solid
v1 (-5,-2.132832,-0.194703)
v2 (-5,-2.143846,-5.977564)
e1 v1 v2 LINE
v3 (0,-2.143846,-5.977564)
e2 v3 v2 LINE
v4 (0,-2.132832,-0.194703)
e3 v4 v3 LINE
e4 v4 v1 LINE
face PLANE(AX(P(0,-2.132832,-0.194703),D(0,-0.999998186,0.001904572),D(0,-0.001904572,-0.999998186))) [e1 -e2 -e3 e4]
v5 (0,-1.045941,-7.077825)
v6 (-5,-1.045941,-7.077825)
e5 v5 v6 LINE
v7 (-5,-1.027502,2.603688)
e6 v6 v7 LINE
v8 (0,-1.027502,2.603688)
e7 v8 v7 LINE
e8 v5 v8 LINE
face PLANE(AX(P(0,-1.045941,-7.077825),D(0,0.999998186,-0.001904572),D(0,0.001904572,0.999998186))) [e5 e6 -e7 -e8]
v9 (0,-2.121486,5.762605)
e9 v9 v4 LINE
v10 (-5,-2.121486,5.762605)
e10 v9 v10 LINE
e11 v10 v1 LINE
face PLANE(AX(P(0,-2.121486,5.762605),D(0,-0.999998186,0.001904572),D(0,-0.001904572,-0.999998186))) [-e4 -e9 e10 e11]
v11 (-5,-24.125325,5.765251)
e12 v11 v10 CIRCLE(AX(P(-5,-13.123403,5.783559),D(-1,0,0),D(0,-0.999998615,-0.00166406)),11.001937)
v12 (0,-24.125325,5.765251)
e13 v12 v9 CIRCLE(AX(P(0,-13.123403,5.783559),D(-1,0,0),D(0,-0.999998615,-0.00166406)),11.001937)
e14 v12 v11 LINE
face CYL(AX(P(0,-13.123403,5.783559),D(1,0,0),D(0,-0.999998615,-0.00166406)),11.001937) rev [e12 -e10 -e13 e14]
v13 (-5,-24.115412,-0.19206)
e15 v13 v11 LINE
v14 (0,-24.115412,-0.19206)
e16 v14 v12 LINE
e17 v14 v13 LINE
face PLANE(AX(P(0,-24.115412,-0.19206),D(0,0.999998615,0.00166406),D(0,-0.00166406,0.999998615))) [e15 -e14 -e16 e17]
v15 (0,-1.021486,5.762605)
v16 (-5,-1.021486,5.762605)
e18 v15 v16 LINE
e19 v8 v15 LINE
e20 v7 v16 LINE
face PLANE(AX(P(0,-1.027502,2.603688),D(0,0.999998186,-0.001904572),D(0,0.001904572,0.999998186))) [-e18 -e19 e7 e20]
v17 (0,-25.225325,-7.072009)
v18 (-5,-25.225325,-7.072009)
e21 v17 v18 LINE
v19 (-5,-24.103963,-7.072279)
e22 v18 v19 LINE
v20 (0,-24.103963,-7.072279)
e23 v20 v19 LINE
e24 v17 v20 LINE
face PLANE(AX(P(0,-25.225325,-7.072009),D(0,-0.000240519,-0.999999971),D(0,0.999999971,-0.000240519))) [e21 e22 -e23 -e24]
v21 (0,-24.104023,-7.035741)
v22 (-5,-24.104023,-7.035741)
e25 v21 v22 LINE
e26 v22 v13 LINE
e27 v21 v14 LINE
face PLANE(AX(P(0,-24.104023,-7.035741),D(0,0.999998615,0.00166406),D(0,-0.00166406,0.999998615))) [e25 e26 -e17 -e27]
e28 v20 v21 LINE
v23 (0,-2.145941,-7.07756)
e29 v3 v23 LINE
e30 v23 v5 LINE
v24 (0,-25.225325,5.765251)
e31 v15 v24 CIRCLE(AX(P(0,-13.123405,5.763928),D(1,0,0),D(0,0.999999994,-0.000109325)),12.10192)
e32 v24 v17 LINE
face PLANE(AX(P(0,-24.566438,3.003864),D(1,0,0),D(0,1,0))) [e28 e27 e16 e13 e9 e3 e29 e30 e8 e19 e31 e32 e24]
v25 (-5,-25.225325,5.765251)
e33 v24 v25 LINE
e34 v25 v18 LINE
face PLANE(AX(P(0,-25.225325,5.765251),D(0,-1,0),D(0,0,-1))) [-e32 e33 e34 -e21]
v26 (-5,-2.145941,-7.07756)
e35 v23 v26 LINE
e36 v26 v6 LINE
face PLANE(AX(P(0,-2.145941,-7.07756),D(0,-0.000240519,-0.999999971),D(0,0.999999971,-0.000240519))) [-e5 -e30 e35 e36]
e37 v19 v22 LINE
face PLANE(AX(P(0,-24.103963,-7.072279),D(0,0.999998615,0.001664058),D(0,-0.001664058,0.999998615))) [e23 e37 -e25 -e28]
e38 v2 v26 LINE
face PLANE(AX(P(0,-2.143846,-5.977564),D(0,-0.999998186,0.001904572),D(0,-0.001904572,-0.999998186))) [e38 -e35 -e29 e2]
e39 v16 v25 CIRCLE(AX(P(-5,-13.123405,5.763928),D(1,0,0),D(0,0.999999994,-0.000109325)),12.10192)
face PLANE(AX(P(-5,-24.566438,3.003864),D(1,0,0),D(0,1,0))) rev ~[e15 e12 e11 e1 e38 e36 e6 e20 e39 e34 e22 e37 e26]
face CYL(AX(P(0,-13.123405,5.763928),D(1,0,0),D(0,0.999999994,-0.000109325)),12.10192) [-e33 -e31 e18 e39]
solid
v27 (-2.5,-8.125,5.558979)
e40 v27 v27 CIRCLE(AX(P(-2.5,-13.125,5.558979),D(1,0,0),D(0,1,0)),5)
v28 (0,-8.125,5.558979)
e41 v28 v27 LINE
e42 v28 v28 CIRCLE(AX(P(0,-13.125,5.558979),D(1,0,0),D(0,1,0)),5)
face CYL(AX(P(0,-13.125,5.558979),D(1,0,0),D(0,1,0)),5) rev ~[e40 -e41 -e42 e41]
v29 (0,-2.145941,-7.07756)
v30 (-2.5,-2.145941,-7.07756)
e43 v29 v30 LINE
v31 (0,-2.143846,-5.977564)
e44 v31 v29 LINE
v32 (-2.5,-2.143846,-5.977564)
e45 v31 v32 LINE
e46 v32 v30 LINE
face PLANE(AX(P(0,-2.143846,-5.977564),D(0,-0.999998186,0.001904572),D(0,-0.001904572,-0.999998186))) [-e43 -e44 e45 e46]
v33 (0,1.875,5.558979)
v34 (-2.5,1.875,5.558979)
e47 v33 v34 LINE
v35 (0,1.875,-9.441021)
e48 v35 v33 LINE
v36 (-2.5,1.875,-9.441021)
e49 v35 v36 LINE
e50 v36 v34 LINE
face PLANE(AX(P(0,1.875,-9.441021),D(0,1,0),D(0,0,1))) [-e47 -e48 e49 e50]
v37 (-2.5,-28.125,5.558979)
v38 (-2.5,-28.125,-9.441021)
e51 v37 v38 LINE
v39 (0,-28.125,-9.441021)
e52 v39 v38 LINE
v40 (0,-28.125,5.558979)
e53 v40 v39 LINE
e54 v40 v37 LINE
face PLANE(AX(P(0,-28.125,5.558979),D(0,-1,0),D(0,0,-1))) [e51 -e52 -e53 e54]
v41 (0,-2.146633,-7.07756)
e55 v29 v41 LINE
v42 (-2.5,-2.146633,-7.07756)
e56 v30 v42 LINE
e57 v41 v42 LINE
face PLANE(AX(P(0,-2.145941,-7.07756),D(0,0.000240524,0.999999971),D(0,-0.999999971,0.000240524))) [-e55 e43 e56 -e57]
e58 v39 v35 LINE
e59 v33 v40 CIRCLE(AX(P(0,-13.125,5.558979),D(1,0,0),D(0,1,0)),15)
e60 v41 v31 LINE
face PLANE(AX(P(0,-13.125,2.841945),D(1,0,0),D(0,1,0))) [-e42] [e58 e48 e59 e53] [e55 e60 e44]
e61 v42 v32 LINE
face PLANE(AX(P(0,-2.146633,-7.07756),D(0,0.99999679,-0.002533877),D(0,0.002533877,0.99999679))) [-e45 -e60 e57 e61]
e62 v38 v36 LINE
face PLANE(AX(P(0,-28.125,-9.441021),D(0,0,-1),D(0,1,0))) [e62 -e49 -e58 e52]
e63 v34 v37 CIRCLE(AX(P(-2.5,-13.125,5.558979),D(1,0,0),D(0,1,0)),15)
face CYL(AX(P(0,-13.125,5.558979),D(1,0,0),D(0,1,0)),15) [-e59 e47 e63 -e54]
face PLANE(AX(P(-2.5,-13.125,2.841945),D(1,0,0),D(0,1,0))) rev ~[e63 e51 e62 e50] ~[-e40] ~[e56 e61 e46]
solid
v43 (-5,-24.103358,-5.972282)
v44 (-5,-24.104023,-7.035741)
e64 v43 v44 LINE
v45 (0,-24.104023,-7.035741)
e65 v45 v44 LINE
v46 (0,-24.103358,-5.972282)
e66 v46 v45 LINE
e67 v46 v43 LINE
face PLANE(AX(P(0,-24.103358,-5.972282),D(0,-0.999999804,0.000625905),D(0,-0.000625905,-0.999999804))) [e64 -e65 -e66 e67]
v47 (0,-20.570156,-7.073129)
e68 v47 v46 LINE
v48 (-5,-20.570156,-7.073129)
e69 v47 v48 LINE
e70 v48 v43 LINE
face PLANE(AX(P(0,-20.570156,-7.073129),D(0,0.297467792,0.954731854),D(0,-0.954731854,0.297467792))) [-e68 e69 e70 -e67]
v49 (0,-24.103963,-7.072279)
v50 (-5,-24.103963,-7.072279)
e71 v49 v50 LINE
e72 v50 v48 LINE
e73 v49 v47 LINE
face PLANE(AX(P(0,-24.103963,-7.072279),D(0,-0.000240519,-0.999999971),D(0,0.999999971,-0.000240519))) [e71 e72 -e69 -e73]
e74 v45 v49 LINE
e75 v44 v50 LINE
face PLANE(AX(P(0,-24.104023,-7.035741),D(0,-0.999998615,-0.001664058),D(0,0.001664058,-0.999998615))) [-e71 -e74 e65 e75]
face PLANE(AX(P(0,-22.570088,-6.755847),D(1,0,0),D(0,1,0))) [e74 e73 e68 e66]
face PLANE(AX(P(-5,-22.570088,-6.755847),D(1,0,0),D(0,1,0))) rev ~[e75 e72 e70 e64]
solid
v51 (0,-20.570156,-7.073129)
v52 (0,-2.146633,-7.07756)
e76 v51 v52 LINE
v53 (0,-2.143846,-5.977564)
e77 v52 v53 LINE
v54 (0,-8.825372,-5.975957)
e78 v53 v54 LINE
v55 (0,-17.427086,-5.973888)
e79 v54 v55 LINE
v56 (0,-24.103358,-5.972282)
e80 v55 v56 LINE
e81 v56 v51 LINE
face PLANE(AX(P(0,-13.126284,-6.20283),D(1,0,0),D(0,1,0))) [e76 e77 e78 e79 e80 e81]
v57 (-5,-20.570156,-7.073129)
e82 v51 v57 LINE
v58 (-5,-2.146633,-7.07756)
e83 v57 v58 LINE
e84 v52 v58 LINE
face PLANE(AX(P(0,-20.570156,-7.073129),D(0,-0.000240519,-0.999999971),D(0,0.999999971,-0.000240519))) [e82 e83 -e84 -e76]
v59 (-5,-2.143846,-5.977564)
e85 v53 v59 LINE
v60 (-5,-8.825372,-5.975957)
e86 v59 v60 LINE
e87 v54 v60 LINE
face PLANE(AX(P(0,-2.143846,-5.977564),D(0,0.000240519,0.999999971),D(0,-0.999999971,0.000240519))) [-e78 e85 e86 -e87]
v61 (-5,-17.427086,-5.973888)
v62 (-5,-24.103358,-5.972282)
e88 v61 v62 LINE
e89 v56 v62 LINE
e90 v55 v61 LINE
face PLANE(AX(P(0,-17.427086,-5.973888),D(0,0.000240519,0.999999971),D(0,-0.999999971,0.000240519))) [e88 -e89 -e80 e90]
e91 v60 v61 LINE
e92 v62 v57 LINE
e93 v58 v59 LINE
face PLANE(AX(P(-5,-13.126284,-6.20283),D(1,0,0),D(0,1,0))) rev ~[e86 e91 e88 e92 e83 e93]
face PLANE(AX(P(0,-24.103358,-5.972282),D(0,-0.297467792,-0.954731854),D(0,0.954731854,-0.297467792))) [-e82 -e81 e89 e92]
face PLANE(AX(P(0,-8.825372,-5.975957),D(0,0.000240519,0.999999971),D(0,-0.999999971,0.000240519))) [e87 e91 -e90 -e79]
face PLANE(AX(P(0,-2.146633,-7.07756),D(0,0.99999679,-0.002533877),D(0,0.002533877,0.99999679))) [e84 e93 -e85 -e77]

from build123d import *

# Parameters (mm, degrees)
F0_R     = 5
F1_DEPTH = 2.5
F2_DEPTH = 5
F3_DEPTH = 5


# Not quite as in the source:
# - a feature names something its author has since deleted; it is built from what else it names


with BuildPart() as f1:
    # F0 (on Right) → F1 (new body)
    with BuildSketch(Plane.YZ):
        with BuildLine():
            Line((1.875, -4.4410212704), (1.875, 5.5589787296))
            ThreePointArc((1.875, 5.5589787296), (-13.125, 20.5589787296), (-28.125, 5.5589787296))
            Line((-28.125, 5.5589787296), (-28.125, -9.4410212704))
            Line((-28.125, -9.4410212704), (1.875, -9.4410212704))
            Line((1.875, -9.4410212704), (1.875, -4.4410212704))
        make_face()
        with BuildLine():
            ThreePointArc((-0.6214854401, 5.7639283943), (-0.6214854576, 5.7632668705), (-0.6214855101, 5.7626053467))
            Line((-0.6214855101, 5.7626053467), (-0.6214855101, -7.441388098))
            Line((-0.6214855101, -7.441388098), (-1.0466333126, -7.4412858417))
            Line((-1.0466333126, -7.4412858417), (-2.1466328087, -7.4410212704))
            Line((-2.1466328087, -7.4410212704), (-24.1033577683, -7.4357402504))
            Line((-24.1033577683, -7.4357402504), (-25.2253250397, -7.4354703954))
            Line((-25.2253250397, -7.4354703954), (-25.6253250397, -7.4353741876))
            Line((-25.6253250397, -7.4353741876), (-25.6253250397, 5.7652514419))
            ThreePointArc((-25.6253250397, 5.7652514419), (-13.1227437511, 18.2658482116), (-0.6214854401, 5.7639283943))
        make_face(mode=Mode.SUBTRACT)
        with BuildLine():
            ThreePointArc((-8.825371599, -5.9759567979), (-4.9508229486, -3.6968800238), (-2.1328316515, -0.1947030957))
            Line((-2.1328316515, -0.1947030957), (-2.1214855101, 5.7626053467))
            ThreePointArc((-2.1214855101, 5.7626053467), (-13.1220798645, 16.7854966034), (-24.1253250397, 5.7652514419))
            Line((-24.1253250397, 5.7652514419), (-24.1154117036, -0.192059557))
            ThreePointArc((-24.1154117036, -0.192059557), (-21.2994002975, -3.6939309404), (-17.4270857953, -5.9738879181))
            Line((-17.4270857953, -5.9738879181), (-8.825371599, -5.9759567979))
        make_face()
        with Locations((-13.125, 5.5589787296)):
            Circle(F0_R, mode=Mode.SUBTRACT)
        with BuildLine():
            ThreePointArc((-25.2253250397, 2.6268061761), (-25.5250055228, 4.1833243656), (-25.6253249696, 5.7652514419))
            Line((-25.6253250397, 5.7652514419), (-25.6253250397, -7.4353741876))
            Line((-25.6253250397, -7.4353741876), (-25.2253250397, -7.4354703954))
            Line((-25.2253250397, -7.4354703954), (-25.2253250397, -7.0720094287))
            Line((-25.2253250397, -7.0720094287), (-25.2253250397, 2.6268061761))
        make_face()
        with BuildLine():
            Line((-2.1214855101, 5.7626053467), (-1.0214855101, 5.7626053467))
            ThreePointArc((-1.0214855101, 5.7626053467), (-13.1220822273, 17.8658481591), (-25.2253250397, 5.7652514419))
            Line((-25.2253250397, 5.7652514419), (-24.1253250397, 5.7652514419))
            ThreePointArc((-24.1253250397, 5.7652514419), (-13.1220798645, 16.7854966034), (-2.1214855101, 5.7626053467))
        make_face()
        with BuildLine():
            Line((-1.0214855101, 5.7626053467), (-0.6214855101, 5.7626053467))
            ThreePointArc((-0.6214855101, 5.7626053467), (-0.6214854576, 5.7632668705), (-0.6214854401, 5.7639283943))
            ThreePointArc((-0.6214854401, 5.7639283943), (-13.1227437511, 18.2658482116), (-25.6253250397, 5.7652514419))
            Line((-25.6253250397, 5.7652514419), (-25.2253250397, 5.7652514419))
            ThreePointArc((-25.2253250397, 5.7652514419), (-13.1220822273, 17.8658481591), (-1.0214855101, 5.7626053467))
        make_face()
        with BuildLine():
            Line((-25.2253250397, 5.7652514419), (-25.6253250397, 5.7652514419))
            ThreePointArc((-25.6253249696, 5.7652514419), (-25.5250055228, 4.1833243656), (-25.2253250397, 2.6268061761))
            Line((-25.2253250397, 2.6268061761), (-25.2253250397, 5.7652514419))
        make_face()
        with BuildLine():
            Line((-24.1253250397, 5.7652514419), (-25.2253250397, 5.7652514419))
            Line((-25.2253250397, 5.7652514419), (-25.2253250397, 2.6268061761))
            ThreePointArc((-25.2253250397, 2.6268061761), (-24.7560686742, 1.1836292728), (-24.1154117036, -0.192059557))
            Line((-24.1154117036, -0.192059557), (-24.1253250397, 5.7652514419))
        make_face()
        Polygon((-24.1033577683, -7.4357402504), (-2.1466328087, -7.4410212704), (-2.1459405703, -7.0775604702), (-2.1466328087, -7.0775603037), (-20.5701562872, -7.0731290875), (-24.1039625902, -7.0722791382), align=None)
        Polygon((-24.1033577683, -5.9722821446), (-24.1040233922, -7.0357408042), (-24.1039625902, -7.0722791382), (-20.5701562872, -7.0731290875), align=None)
        with BuildLine():
            ThreePointArc((-17.4270857953, -5.9738879181), (-13.12641223, -6.7379910088), (-8.825371599, -5.9759567979))
            Line((-8.825371599, -5.9759567979), (-17.4270857953, -5.9738879181))
        make_face()
        Polygon((-25.2253250397, -7.0720094287), (-25.2253250397, -7.4354703954), (-24.1033577683, -7.4357402504), (-24.1039625902, -7.0722791382), align=None)
        with BuildLine():
            ThreePointArc((-24.1154117036, -0.192059557), (-24.7560686742, 1.1836292728), (-25.2253250397, 2.6268061761))
            Line((-25.2253250397, 2.6268061761), (-25.2253250397, -7.0720094287))
            Line((-25.2253250397, -7.0720094287), (-24.1039625902, -7.0722791382))
            Line((-24.1039625902, -7.0722791382), (-24.1040233922, -7.0357408042))
            Line((-24.1040233922, -7.0357408042), (-24.1154117036, -0.192059557))
        make_face()
        with BuildLine():
            Line((-0.6214855101, -7.441388098), (-0.6214855101, 5.7626053467))
            ThreePointArc((-0.6214855801, 5.7626053467), (-0.7234893636, 4.1701645483), (-1.0275019055, 2.6036879789))
            Line((-1.0275019055, 2.6036879789), (-1.0459410742, -7.0778250415))
            Line((-1.0459410742, -7.0778250415), (-1.0466333126, -7.4412858417))
            Line((-1.0466333126, -7.4412858417), (-0.6214855101, -7.441388098))
        make_face()
        with BuildLine():
            ThreePointArc((-1.0275019055, 2.6036879789), (-0.7234893636, 4.1701645483), (-0.6214855801, 5.7626053467))
            Line((-0.6214855101, 5.7626053467), (-1.0214855101, 5.7626053467))
            Line((-1.0214855101, 5.7626053467), (-1.0275019055, 2.6036879789))
        make_face()
        with BuildLine():
            ThreePointArc((-2.1328316515, -0.1947030957), (-1.495675353, 1.1711193771), (-1.0275019055, 2.6036879789))
            Line((-1.0275019055, 2.6036879789), (-1.0214855101, 5.7626053467))
            Line((-1.0214855101, 5.7626053467), (-2.1214855101, 5.7626053467))
            Line((-2.1214855101, 5.7626053467), (-2.1328316515, -0.1947030957))
        make_face()
        with BuildLine():
            Line((-1.0459410742, -7.0778250415), (-1.0275019055, 2.6036879789))
            ThreePointArc((-1.0275019055, 2.6036879789), (-1.495675353, 1.1711193771), (-2.1328316515, -0.1947030957))
            Line((-2.1328316515, -0.1947030957), (-2.1438455441, -5.977563835))
            Line((-2.1438455441, -5.977563835), (-2.1459405703, -7.0775604702))
            Line((-2.1459405703, -7.0775604702), (-1.0459410742, -7.0778250415))
        make_face()
        with BuildLine():
            Line((-2.1438455441, -5.977563835), (-2.1328316515, -0.1947030957))
            ThreePointArc((-2.1328316515, -0.1947030957), (-4.9508229486, -3.6968800238), (-8.825371599, -5.9759567979))
            Line((-8.825371599, -5.9759567979), (-2.1438455441, -5.977563835))
        make_face()
        Polygon((-2.1466328087, -7.4410212704), (-1.0466333126, -7.4412858417), (-1.0459410742, -7.0778250415), (-2.1459405703, -7.0775604702), align=None)
        with BuildLine():
            ThreePointArc((-17.4270857953, -5.9738879181), (-21.2994002975, -3.6939309404), (-24.1154117036, -0.192059557))
            Line((-24.1154117036, -0.192059557), (-24.1040233922, -7.0357408042))
            Line((-24.1040233922, -7.0357408042), (-24.1033577683, -5.9722821446))
            Line((-24.1033577683, -5.9722821446), (-17.4270857953, -5.9738879181))
        make_face()
        Polygon((-20.5701562872, -7.0731290875), (-17.4270857953, -5.9738879181), (-24.1033577683, -5.9722821446), align=None)
        with BuildLine():
            Line((-2.1438455441, -5.977563835), (-8.825371599, -5.9759567979))
            ThreePointArc((-8.825371599, -5.9759567979), (-13.12641223, -6.7379910088), (-17.4270857953, -5.9738879181))
            Line((-17.4270857953, -5.9738879181), (-20.5701562872, -7.0731290875))
            Line((-20.5701562872, -7.0731290875), (-2.1466328087, -7.0775603037))
            Line((-2.1466328087, -7.0775603037), (-2.1438455441, -5.977563835))
        make_face()
    extrude(amount=-F1_DEPTH)


with BuildPart() as f2:
    # F0 (on Right) → F2 (new body)
    with BuildSketch(Plane.YZ):
        with BuildLine():
            Line((-24.1253250397, 5.7652514419), (-25.2253250397, 5.7652514419))
            Line((-25.2253250397, 5.7652514419), (-25.2253250397, 2.6268061761))
            ThreePointArc((-25.2253250397, 2.6268061761), (-24.7560686742, 1.1836292728), (-24.1154117036, -0.192059557))
            Line((-24.1154117036, -0.192059557), (-24.1253250397, 5.7652514419))
        make_face()
        with BuildLine():
            Line((-2.1214855101, 5.7626053467), (-1.0214855101, 5.7626053467))
            ThreePointArc((-1.0214855101, 5.7626053467), (-13.1220822273, 17.8658481591), (-25.2253250397, 5.7652514419))
            Line((-25.2253250397, 5.7652514419), (-24.1253250397, 5.7652514419))
            ThreePointArc((-24.1253250397, 5.7652514419), (-13.1220798645, 16.7854966034), (-2.1214855101, 5.7626053467))
        make_face()
        with BuildLine():
            ThreePointArc((-2.1328316515, -0.1947030957), (-1.495675353, 1.1711193771), (-1.0275019055, 2.6036879789))
            Line((-1.0275019055, 2.6036879789), (-1.0214855101, 5.7626053467))
            Line((-1.0214855101, 5.7626053467), (-2.1214855101, 5.7626053467))
            Line((-2.1214855101, 5.7626053467), (-2.1328316515, -0.1947030957))
        make_face()
        with BuildLine():
            Line((-1.0459410742, -7.0778250415), (-1.0275019055, 2.6036879789))
            ThreePointArc((-1.0275019055, 2.6036879789), (-1.495675353, 1.1711193771), (-2.1328316515, -0.1947030957))
            Line((-2.1328316515, -0.1947030957), (-2.1438455441, -5.977563835))
            Line((-2.1438455441, -5.977563835), (-2.1459405703, -7.0775604702))
            Line((-2.1459405703, -7.0775604702), (-1.0459410742, -7.0778250415))
        make_face()
        with BuildLine():
            ThreePointArc((-24.1154117036, -0.192059557), (-24.7560686742, 1.1836292728), (-25.2253250397, 2.6268061761))
            Line((-25.2253250397, 2.6268061761), (-25.2253250397, -7.0720094287))
            Line((-25.2253250397, -7.0720094287), (-24.1039625902, -7.0722791382))
            Line((-24.1039625902, -7.0722791382), (-24.1040233922, -7.0357408042))
            Line((-24.1040233922, -7.0357408042), (-24.1154117036, -0.192059557))
        make_face()
    extrude(amount=-F2_DEPTH)


with BuildPart() as f2b:
    # F0 (on Right) → F2, piece 2 (new body)
    with BuildSketch(Plane.YZ):
        with BuildLine():
            ThreePointArc((-17.4270857953, -5.9738879181), (-13.12641223, -6.7379910088), (-8.825371599, -5.9759567979))
            Line((-8.825371599, -5.9759567979), (-17.4270857953, -5.9738879181))
        make_face()
        Polygon((-20.5701562872, -7.0731290875), (-17.4270857953, -5.9738879181), (-24.1033577683, -5.9722821446), align=None)
        with BuildLine():
            Line((-2.1438455441, -5.977563835), (-8.825371599, -5.9759567979))
            ThreePointArc((-8.825371599, -5.9759567979), (-13.12641223, -6.7379910088), (-17.4270857953, -5.9738879181))
            Line((-17.4270857953, -5.9738879181), (-20.5701562872, -7.0731290875))
            Line((-20.5701562872, -7.0731290875), (-2.1466328087, -7.0775603037))
            Line((-2.1466328087, -7.0775603037), (-2.1438455441, -5.977563835))
        make_face()
    extrude(amount=-F2_DEPTH)


with BuildPart() as f3:
    # F0 (on Right) → F3 (new body)
    with BuildSketch(Plane.YZ):
        Polygon((-24.1033577683, -5.9722821446), (-24.1040233922, -7.0357408042), (-24.1039625902, -7.0722791382), (-20.5701562872, -7.0731290875), align=None)
    extrude(amount=-F3_DEPTH)


solid = Compound([f1.part, f2.part, f2b.part, f3.part])
